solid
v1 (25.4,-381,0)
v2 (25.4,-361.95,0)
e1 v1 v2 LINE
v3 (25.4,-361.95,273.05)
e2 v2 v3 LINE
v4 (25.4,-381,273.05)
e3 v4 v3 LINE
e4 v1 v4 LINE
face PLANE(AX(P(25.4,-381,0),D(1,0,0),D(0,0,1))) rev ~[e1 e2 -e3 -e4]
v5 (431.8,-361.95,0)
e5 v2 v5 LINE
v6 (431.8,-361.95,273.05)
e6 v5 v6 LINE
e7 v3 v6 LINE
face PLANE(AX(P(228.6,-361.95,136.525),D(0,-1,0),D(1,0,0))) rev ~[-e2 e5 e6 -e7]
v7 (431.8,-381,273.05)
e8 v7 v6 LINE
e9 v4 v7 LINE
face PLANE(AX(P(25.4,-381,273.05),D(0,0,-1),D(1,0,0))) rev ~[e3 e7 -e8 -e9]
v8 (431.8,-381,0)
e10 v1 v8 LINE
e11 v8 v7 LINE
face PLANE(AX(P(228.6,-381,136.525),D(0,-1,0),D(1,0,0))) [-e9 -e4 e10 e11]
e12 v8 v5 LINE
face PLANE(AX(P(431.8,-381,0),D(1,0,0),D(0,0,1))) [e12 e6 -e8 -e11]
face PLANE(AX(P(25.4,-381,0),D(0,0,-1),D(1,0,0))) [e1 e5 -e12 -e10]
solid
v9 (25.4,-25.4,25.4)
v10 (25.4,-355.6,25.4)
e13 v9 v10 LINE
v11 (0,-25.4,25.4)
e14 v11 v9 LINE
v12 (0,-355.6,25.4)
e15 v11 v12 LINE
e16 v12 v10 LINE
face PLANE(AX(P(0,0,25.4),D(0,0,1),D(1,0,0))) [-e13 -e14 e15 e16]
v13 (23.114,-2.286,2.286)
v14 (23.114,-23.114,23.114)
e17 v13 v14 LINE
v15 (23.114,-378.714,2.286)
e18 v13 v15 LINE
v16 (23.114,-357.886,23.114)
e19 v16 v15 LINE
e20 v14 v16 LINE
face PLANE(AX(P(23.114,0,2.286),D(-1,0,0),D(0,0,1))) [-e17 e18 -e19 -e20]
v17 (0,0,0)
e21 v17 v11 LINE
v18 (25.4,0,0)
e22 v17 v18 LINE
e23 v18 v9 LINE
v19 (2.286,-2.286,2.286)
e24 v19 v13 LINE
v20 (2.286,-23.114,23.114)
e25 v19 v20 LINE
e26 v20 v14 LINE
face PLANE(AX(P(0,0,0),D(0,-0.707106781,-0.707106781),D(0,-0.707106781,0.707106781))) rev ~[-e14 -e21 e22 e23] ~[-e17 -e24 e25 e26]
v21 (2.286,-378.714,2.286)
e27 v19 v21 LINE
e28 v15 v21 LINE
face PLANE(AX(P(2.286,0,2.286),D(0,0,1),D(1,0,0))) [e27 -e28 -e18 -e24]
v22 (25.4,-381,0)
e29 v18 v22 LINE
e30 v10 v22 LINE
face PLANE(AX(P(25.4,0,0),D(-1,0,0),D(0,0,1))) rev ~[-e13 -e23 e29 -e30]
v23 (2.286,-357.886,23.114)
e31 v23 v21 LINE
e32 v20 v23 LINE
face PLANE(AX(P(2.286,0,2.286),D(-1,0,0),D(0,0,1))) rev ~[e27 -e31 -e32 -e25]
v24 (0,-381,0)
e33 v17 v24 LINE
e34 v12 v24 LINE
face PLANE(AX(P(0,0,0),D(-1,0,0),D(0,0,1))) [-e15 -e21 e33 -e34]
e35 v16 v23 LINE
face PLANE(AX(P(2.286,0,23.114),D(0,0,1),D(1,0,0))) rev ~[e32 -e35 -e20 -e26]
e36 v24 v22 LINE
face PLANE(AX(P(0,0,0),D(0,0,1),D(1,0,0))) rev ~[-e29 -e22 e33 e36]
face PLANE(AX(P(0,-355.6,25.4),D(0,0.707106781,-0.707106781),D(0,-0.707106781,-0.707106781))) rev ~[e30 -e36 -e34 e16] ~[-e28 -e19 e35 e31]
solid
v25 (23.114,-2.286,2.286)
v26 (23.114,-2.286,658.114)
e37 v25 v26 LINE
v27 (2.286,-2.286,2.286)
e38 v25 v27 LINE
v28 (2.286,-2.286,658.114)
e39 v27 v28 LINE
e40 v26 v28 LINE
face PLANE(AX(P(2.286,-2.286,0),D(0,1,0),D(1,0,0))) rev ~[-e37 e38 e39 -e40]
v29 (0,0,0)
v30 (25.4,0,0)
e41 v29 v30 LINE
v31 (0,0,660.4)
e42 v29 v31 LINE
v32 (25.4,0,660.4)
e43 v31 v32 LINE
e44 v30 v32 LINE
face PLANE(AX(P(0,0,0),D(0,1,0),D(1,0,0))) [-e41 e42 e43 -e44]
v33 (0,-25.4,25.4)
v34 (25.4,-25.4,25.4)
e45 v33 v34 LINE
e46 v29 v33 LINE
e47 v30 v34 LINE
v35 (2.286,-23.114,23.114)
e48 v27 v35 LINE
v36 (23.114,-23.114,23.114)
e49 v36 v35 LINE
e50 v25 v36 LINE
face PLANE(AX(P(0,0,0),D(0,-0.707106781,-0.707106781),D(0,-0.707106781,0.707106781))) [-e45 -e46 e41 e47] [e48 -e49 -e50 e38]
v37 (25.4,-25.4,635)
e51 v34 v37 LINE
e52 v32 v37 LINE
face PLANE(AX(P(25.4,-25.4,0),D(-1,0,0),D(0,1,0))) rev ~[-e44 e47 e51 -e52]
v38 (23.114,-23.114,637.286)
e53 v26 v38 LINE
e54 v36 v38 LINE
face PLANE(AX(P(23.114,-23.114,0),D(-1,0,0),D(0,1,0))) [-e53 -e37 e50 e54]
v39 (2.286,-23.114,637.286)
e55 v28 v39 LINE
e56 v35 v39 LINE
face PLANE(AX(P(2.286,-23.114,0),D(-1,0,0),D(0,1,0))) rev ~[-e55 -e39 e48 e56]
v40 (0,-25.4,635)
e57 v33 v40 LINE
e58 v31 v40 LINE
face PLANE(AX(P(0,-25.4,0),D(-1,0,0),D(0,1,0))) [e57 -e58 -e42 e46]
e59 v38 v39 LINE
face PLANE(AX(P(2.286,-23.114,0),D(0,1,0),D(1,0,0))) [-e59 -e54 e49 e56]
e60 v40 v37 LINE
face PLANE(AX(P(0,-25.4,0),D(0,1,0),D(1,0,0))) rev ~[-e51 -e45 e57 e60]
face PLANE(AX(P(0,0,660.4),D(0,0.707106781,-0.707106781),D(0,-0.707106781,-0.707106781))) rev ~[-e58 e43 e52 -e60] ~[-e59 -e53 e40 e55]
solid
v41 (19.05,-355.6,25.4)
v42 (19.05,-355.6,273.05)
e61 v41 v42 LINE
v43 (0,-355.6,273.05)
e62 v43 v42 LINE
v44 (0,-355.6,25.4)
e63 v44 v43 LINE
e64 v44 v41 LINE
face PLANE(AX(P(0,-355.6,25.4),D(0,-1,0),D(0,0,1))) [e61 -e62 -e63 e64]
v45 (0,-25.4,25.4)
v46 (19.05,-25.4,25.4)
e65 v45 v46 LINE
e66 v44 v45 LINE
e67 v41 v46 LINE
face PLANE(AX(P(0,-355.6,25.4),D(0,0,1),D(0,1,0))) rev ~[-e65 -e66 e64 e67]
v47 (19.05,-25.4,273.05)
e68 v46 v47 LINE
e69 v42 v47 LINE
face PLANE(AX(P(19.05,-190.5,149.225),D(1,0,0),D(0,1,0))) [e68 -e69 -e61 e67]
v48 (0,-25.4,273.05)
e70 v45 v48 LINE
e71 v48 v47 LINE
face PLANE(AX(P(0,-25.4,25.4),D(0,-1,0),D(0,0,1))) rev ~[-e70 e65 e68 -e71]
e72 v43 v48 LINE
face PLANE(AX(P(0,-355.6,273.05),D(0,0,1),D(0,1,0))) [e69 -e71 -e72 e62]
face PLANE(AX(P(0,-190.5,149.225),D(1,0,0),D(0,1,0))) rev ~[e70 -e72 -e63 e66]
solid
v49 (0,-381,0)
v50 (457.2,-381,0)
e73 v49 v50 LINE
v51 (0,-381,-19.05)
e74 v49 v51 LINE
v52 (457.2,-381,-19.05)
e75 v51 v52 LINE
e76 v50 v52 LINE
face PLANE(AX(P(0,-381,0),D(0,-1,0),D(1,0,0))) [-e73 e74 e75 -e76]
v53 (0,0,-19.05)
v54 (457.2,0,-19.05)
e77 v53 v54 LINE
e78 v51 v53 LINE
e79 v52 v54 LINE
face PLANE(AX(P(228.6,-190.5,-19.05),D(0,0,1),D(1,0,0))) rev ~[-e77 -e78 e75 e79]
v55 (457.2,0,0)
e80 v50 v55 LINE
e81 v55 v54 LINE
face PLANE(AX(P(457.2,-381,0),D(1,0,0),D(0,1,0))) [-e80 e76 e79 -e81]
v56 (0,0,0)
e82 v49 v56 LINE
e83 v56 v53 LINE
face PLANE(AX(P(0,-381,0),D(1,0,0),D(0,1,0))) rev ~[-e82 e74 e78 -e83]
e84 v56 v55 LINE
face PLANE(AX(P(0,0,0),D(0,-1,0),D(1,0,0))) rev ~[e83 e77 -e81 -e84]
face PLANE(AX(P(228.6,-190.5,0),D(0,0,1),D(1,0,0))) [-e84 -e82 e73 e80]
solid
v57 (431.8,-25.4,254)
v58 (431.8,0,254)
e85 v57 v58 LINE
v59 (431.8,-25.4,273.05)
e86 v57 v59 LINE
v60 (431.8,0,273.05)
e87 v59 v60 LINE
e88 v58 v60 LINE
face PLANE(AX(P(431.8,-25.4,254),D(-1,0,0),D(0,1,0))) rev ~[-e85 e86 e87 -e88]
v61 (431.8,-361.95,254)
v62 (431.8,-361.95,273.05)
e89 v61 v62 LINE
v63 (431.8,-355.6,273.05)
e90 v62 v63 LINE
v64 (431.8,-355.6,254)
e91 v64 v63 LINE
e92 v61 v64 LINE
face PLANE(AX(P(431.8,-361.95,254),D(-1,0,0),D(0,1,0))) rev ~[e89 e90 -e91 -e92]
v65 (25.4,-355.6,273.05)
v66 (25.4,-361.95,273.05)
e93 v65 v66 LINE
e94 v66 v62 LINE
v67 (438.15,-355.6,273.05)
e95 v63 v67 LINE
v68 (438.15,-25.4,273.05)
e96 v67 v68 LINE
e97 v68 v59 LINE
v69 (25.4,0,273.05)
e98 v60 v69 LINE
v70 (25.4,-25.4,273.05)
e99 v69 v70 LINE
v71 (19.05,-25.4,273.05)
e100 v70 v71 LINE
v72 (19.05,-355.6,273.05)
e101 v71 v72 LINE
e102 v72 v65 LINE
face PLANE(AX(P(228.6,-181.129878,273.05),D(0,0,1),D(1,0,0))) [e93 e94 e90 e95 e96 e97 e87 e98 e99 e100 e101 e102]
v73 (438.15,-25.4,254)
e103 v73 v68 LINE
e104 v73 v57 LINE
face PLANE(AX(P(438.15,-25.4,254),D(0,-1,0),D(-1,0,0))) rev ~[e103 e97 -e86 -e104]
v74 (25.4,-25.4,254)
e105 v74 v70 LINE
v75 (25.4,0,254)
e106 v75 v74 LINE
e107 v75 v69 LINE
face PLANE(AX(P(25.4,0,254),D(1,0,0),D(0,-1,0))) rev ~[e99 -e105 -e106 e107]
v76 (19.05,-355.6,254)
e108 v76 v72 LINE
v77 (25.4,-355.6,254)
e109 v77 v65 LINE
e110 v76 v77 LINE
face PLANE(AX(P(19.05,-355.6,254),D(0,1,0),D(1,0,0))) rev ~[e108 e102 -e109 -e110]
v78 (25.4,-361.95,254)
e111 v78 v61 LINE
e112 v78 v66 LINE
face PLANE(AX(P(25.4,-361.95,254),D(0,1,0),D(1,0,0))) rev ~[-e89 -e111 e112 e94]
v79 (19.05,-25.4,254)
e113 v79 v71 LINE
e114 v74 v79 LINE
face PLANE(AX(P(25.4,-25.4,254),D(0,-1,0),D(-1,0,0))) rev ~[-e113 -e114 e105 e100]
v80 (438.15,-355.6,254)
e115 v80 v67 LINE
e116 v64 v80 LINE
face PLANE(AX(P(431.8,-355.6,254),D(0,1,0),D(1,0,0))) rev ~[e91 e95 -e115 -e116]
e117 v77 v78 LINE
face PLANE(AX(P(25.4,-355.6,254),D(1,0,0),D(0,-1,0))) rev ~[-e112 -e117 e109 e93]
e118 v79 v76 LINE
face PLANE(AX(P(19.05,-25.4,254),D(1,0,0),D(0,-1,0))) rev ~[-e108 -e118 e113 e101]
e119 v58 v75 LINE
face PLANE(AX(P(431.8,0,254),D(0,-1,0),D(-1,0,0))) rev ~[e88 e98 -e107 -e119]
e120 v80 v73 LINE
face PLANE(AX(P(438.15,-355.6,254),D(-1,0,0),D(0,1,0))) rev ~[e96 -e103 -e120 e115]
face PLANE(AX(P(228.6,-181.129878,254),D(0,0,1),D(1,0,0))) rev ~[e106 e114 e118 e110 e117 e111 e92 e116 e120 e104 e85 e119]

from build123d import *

# Parameters (mm, degrees)
F0_W      = 25.4
F0_H      = 25.4
F0_W_2    = 20.828
F0_H_2    = 20.828
F1_DEPTH  = 660.4
F3_DEPTH  = 25.4
F5_DEPTH  = 25.4
F6_W      = 25.4
F6_H      = 25.4
F6_W_2    = 20.828
F6_H_2    = 20.828
F7_DEPTH  = 381
F9_DEPTH  = 25.4
F10_W     = 457.2
F10_H     = 381
F11_DEPTH = 19.05
F14_DEPTH = 19.05
F15_W     = 330.2
F15_H     = 247.65
F16_DEPTH = 19.05
F17_W     = 406.4
F17_H     = 273.05
F18_DEPTH = 19.05


with BuildPart() as f1:
    # F0 (on Top) → F1 (new body)
    with BuildSketch(Plane.XY):
        with Locations((12.7, -12.7)):
            Rectangle(F0_W, F0_H)
        with Locations((12.7, -12.7)):
            Rectangle(F0_W_2, F0_H_2, mode=Mode.SUBTRACT)
    extrude(amount=F1_DEPTH)

    # F2 (on Right) → F3 (cut)
    with BuildSketch(Plane.YZ):
        Polygon((-25.4, 0), (0, 0), (-25.4, 25.4), align=None)
    extrude(amount=F3_DEPTH, mode=Mode.SUBTRACT)

    # F4 (on face) → F5 (cut, through all)
    with BuildSketch(Plane(origin=(0, 0, 0), x_dir=(0, -1, 0), z_dir=(-1, 0, 0))):
        Polygon((25.4, 660.4), (0, 660.4), (25.4, 635), align=None)
    extrude(amount=-F5_DEPTH, mode=Mode.SUBTRACT)


with BuildPart() as f7:
    # F6 (on Front) → F7 (new body)
    with BuildSketch(Plane.XZ):
        with Locations((12.7, 12.7)):
            Rectangle(F6_W, F6_H)
        with Locations((12.7, 12.7)):
            Rectangle(F6_W_2, F6_H_2, mode=Mode.SUBTRACT)
    extrude(amount=F7_DEPTH)

    # F8 (on face) → F9 (cut, through all)
    with BuildSketch(Plane(origin=(0, 0, 0), x_dir=(0, -1, 0), z_dir=(-1, 0, 0))):
        Polygon((355.6, 25.4), (381, 0), (381, 25.4), align=None)
        Polygon((0, 25.4), (0, 0), (25.4, 25.4), align=None)
    extrude(amount=-F9_DEPTH, mode=Mode.SUBTRACT)


with BuildPart() as f11:
    # F10 (on Top) → F11 (new body)
    with BuildSketch(Plane.XY):
        with Locations((228.6, -190.5)):
            Rectangle(F10_W, F10_H)
    extrude(amount=-F11_DEPTH)


with BuildPart() as f14:
    # F13 (on offset) → F14 (new body)
    with BuildSketch(Plane.XY.offset(254)):
        Polygon((431.8, 0), (25.4, 0), (25.4, -25.4), (19.05, -25.4), (19.05, -355.6), (25.4000000002, -355.6), (25.4, -361.95), (431.8, -361.95), (431.8, -355.6), (438.15, -355.6), (438.15, -25.4), (431.8, -25.4), align=None)
    extrude(amount=F14_DEPTH)


with BuildPart() as f16:
    # F15 (on Right) → F16 (new body)
    with BuildSketch(Plane.YZ):
        with Locations((-190.5, 149.225)):
            Rectangle(F15_W, F15_H)
    extrude(amount=F16_DEPTH)


with BuildPart() as f18:
    # F17 (on face) → F18 (new body)
    with BuildSketch(Plane.XZ.offset(381)):
        with Locations((228.6, 136.525)):
            Rectangle(F17_W, F17_H)
    extrude(amount=-F18_DEPTH)


solid = Compound([f1.part, f7.part, f11.part, f14.part, f16.part, f18.part])
